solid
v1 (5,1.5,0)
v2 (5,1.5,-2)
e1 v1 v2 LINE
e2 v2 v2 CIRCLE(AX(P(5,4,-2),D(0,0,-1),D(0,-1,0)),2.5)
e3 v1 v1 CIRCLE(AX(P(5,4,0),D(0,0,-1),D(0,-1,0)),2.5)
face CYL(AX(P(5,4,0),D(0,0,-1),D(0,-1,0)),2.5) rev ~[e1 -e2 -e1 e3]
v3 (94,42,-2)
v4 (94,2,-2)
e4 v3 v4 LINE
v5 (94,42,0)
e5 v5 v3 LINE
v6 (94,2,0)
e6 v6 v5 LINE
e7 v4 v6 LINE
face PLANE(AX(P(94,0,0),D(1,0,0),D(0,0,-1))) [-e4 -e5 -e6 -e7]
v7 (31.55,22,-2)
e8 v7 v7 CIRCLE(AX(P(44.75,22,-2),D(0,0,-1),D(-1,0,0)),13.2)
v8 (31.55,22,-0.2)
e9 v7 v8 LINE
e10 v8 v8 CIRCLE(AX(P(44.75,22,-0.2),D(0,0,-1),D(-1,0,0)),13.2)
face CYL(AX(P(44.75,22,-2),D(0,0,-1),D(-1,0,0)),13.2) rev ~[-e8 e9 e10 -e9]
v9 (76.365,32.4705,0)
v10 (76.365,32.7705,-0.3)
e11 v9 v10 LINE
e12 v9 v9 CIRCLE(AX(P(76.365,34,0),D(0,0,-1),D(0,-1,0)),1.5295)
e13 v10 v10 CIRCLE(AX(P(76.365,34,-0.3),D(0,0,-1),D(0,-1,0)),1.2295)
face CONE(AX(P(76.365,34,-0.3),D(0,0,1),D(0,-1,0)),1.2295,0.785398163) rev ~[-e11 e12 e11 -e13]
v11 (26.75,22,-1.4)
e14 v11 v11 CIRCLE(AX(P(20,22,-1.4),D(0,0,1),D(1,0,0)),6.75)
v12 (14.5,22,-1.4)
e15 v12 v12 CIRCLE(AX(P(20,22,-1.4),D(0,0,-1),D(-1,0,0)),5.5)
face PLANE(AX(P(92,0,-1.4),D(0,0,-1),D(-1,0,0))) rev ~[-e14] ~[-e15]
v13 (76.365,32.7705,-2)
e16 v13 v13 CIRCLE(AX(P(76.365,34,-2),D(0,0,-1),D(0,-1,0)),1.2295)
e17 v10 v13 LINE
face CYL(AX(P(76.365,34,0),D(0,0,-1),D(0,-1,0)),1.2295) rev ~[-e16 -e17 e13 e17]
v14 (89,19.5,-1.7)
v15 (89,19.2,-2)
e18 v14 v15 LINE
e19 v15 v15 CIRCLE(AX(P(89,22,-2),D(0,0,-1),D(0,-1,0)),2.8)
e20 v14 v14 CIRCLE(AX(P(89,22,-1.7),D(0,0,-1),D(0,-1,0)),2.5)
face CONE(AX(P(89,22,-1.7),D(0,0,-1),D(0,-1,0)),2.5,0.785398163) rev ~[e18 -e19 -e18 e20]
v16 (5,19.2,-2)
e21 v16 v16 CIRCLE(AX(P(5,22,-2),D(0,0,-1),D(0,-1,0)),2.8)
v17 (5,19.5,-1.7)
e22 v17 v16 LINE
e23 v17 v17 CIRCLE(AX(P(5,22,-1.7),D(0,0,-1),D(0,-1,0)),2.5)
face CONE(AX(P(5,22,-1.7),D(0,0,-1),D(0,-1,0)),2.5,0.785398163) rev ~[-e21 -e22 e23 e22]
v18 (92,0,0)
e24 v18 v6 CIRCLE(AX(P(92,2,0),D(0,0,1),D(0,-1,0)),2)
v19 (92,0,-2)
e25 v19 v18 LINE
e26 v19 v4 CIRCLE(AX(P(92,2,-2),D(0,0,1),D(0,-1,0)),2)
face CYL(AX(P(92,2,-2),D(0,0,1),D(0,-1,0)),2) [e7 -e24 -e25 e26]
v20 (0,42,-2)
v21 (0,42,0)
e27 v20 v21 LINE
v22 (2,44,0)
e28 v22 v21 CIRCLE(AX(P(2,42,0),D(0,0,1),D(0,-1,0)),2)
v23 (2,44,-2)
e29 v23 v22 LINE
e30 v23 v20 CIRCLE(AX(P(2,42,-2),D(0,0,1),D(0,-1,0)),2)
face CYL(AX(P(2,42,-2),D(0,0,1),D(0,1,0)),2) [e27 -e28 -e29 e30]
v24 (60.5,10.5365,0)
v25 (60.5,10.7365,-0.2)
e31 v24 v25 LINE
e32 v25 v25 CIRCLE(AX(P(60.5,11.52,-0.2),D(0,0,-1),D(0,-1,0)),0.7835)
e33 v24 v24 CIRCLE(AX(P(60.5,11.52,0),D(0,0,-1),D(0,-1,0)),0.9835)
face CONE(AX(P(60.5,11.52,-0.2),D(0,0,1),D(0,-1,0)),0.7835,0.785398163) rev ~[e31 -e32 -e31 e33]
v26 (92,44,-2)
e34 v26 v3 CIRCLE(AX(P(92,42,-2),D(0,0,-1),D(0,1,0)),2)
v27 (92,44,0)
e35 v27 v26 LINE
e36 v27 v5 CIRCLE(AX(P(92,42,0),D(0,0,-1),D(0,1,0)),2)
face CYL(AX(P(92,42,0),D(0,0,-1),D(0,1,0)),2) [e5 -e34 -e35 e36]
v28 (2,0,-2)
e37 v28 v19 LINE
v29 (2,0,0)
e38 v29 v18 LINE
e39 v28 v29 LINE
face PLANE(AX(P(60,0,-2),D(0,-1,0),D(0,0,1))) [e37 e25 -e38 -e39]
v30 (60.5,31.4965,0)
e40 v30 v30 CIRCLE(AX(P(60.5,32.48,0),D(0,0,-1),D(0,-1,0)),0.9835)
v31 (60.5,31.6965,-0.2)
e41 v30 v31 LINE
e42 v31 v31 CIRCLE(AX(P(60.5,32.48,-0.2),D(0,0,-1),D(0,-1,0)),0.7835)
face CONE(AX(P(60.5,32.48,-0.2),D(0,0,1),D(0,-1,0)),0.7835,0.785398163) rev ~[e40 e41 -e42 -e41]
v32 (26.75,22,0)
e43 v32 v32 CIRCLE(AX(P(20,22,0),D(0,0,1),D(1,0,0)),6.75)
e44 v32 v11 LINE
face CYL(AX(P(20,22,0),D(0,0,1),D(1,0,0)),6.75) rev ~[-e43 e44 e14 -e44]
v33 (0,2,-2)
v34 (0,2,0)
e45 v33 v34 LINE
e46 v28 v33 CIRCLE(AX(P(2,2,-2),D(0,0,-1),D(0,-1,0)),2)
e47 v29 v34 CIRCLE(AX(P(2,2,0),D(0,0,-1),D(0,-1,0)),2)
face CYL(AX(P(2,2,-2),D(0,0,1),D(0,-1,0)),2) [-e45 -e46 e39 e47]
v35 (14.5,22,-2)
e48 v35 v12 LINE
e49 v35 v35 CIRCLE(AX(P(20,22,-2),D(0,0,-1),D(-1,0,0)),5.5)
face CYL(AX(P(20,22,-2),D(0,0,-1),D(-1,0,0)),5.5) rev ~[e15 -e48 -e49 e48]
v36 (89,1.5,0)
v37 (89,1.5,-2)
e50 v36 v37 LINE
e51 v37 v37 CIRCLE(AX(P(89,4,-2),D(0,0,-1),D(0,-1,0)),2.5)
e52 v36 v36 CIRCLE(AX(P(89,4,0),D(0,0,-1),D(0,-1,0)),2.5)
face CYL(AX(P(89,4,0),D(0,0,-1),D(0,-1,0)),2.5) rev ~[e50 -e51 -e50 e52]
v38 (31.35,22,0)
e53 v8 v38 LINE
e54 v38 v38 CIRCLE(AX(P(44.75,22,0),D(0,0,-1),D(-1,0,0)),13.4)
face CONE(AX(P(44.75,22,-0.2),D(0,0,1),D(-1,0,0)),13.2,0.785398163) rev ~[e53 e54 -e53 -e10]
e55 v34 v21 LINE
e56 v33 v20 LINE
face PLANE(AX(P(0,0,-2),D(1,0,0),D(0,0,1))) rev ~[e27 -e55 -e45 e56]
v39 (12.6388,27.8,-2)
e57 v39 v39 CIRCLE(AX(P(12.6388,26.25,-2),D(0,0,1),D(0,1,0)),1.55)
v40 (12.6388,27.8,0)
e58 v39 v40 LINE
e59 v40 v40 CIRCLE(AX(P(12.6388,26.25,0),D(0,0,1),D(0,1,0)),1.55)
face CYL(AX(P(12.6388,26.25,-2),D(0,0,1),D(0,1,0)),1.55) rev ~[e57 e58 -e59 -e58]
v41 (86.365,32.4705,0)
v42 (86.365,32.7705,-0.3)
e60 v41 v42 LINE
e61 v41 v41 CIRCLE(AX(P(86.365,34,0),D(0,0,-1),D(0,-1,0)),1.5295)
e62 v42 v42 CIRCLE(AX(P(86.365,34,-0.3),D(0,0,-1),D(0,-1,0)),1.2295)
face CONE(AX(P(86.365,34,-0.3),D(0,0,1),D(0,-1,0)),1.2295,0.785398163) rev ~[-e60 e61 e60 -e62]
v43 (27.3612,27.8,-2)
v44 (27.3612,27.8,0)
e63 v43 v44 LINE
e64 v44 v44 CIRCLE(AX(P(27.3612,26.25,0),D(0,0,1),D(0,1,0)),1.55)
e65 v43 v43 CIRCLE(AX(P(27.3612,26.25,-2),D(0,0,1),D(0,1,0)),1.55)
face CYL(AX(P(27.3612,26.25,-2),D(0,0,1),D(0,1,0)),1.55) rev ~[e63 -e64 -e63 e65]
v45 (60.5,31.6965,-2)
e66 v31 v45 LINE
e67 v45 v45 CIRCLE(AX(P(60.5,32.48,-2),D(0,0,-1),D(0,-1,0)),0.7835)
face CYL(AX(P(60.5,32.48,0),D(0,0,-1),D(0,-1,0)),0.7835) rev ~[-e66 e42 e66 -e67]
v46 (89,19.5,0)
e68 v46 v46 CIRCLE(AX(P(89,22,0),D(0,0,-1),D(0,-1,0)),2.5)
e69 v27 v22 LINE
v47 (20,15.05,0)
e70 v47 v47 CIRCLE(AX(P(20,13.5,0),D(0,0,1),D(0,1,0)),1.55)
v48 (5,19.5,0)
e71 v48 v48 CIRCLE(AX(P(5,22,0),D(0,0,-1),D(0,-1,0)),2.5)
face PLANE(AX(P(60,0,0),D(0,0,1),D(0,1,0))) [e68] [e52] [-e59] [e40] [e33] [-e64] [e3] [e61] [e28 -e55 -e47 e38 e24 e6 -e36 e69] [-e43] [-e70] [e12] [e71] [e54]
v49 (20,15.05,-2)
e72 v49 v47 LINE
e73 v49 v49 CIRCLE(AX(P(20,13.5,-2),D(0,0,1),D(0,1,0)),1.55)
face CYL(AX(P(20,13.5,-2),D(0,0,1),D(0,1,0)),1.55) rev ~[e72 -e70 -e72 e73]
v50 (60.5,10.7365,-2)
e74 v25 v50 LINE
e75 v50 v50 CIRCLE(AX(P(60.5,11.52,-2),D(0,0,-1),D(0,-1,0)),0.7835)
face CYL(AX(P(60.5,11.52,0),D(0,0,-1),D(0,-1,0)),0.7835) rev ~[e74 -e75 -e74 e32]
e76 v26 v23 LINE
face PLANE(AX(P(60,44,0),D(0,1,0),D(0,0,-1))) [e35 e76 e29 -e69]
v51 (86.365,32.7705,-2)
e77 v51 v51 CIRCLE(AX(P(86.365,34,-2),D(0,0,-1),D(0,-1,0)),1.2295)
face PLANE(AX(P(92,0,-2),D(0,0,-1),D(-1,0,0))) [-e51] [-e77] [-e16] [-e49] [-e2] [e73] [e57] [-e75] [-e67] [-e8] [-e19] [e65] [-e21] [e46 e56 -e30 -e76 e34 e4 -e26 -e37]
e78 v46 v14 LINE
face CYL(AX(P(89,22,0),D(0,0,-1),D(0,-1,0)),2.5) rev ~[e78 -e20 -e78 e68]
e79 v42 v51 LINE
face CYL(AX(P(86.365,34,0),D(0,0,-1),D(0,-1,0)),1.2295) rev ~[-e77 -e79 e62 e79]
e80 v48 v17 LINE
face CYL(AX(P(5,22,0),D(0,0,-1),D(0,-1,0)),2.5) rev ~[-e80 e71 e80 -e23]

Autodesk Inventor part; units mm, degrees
ref_plane "YZ Plane" through (0, 0, 0) normal (1, 0, 0) x (0, 1, 0)
ref_plane "XZ Plane" through (0, 0, 0) normal (0, 1, 0) x (-1, 0, 0)
ref_plane "XY Plane" through (0, 0, 0) normal (0, 0, 1) x (1, 0, 0)
sketch "Sketch1" plane through (0, 0, 0) normal (0, 1, 0) x (-1, 0, 0)
  line L0 (0, 0) -> (-40, 0)
  line L1 (-40, 0) -> (-40, -2)
  line L2 (-40, -2) -> (0, -2)
  line L3 (0, -2) -> (0, 0)
  dimension "d0" = 40
  dimension "d1" = 2
extrude "Extrusion1" add sketch "Sketch1" along normal blind 44
sketch "Sketch2" plane through (0, 0, 0) normal (0, 0, 1) x (1, 0, 0)
  line L0 (40, 44) -> (0, 44) construction
  line L1 (0, 44) -> (40, 0) construction
  line L2 (40, 44) -> (0, 0) construction
  circle A0 centre (20, 22) radius 6.75
  dimension "d4" = 13.5
extrude "Extrusion2" cut sketch "Sketch2" against normal blind 40
sketch "Sketch3" plane through (40, 0, -2) normal (0, 0, -1) x (-1, 0, 0)
  circle A0 centre (20, 22) radius 6.75 construction
  circle A1 centre (20, 22) radius 8.5 construction
  circle A2 centre (12.6388, 26.25) radius 1.1 construction
  circle A3 centre (27.3612, 26.25) radius 1.1 construction
  line L0 (20, 22) -> (27.3612, 26.25) construction
  line L1 (20, 22) -> (12.6388, 26.25) construction
  circle A4 centre (20, 13.5) radius 1.1 construction
  line L2 (20, 22) -> (20, 13.5) construction
  line L3 (40, 0) -> (40, 44) construction
  dimension "d7" = 17
  dimension "d9" = 2.2
  dimension "d10" = 2.2
  dimension "d22" = 2.2
  dimension "d25" = 120
  dimension "d26" = 120
hole "Hole1" at (20, 13.5, -2) at (12.6388, 26.25, -2) at (27.3612, 26.25, -2) direction (0, 0, 1) diameter 3.1 depth 8.8 tip angle 118 clearance for "Countersunk Flat Head Screw ISO 2009/7046" size "M3" standard "ISO"
sketch "Sketch4" plane through (40, 0, 0) normal (1, 0, 0) x (0, 0, -1)
  line L0 (0, 44) -> (2, 44) projected
  line L1 (0, 0) -> (2, 0)
  line L2 (2, 0) -> (2, 44)
  line L3 (2, 44) -> (0, 44)
  line L4 (0, 44) -> (0, 0)
extrude "Extrusion3" add sketch "Sketch4" along normal blind 20
sketch "Sketch5" plane through (0, 0, -2) normal (0, 0, -1) x (-1, 0, 0)
  circle A0 centre (-44.75, 22) radius 13.2
  line L0 (0, 0) -> (-60, 0) projected
  line L1 (-60, 0) -> (-60.0955, 41.9998)
  line L2 (0, 0) -> (0, 44) projected
  dimension "d27" = 26.4
  dimension "d28" = 22
  dimension "d29" = 15.3
  dimension "d45" = 44.75
extrude "Extrusion4" cut sketch "Sketch5" against normal through all
sketch "Sketch6" plane through (60, 0, 0) normal (1, 0, 0) x (0, 0, -1)
  line L0 (0, 0) -> (0, 44) projected
  line L1 (2, 0) -> (0, 0) projected
  line L2 (0, 44) -> (2, 44)
  line L3 (2, 44) -> (2, 0)
  line L4 (2, 0) -> (0, 0)
  line L5 (0, 0) -> (0, 44)
extrude "Extrusion5" add sketch "Sketch6" along normal blind 34
fillet "Fillet1" radius 2 4 edges at (0, 44, -1) (0, 0, -1) (94, 44, -1) (94, 0, -1)
sketch "Sketch7" plane through (2, 0, 0) normal (0, 0, 1) x (1, 0, 0)
  circle A0 centre (87, 22) radius 2.5
  circle A1 centre (3, 22) radius 2.5
  line L0 (0, 44) -> (90, 44) projected
  line L1 (92, 42) -> (92, 2) projected
  line L2 (0, 0) -> (90, 0) projected
  line L3 (-2, 2) -> (-2, 42) projected
  circle A2 centre (87, 4) radius 2.5
  circle A3 centre (3, 4) radius 2.5
  point P0 (-2, 0)
  dimension "d53" = 5
  dimension "d54" = 5
  dimension "d55" = 22
  dimension "d56" = 5
  dimension "d57" = 22
  dimension "d58" = 5
  dimension "d69" = 44
  dimension "d73" = 5
  dimension "d74" = 18
  dimension "d75" = 5
hole "Hole2" at (5, 22, 0) at (89, 22, 0) at (89, 4, 0) at (5, 4, 0) direction (0, 0, -1) diameter 5 depth 14.2 tip angle 118
chamfer "Chamfer1" distance 0.3 angle 45 2 edges at (5, 24.5, -2) (89, 24.5, -2)
sketch "Sketch8" plane through (92, 0, -2) normal (0, 0, -1) x (-1, 0, 0)
  circle A0 centre (72, 22) radius 6.75 projected
  circle A1 centre (72, 22) radius 6.75
  circle A2 centre (72, 22) radius 5.5
  point P0 (92, 0)
  dimension "d70" = 11
extrude "Extrusion6" add sketch "Sketch8" against normal blind 0.6
sketch "Sketch9" plane through (2, 0, 0) normal (0, 0, 1) x (1, 0, 0)
  circle A0 centre (58.5, 32.48) radius 1
  circle A1 centre (58.5, 11.52) radius 1
  line L0 (0, 44) -> (90, 44) projected
  line L1 (0, 0) -> (90, 0) projected
  line L2 (92, 42) -> (92, 2) projected
  point P0 (-2, 0)
  dimension "d76" = 2
  dimension "d77" = 2
  dimension "d78" = 20.96
  dimension "d79" = 44
  dimension "d80" = 11.52
  dimension "d81" = 33.5
hole "Hole3" at (60.5, 11.52, 0) at (60.5, 32.48, 0) direction (0, 0, -1) diameter 1.567 depth 6.3 tip angle 118 thread size "M2x0.4" class "6H" standard "ISO Metric profile"
chamfer "Chamfer2" distance 0.2 angle 45 1 edges at (57.95, 22, 0)
chamfer "Chamfer3" distance 0.2 angle 45 2 edges at (60.5, 12.3035, 0) (60.5, 33.2635, 0)
sketch "Sketch10" plane through (2, 0, 0) normal (0, 0, 1) x (1, 0, 0)
  circle A0 centre (84.365, 34) radius 1
  circle A1 centre (74.365, 34) radius 1
  line L0 (0, 44) -> (90, 44) projected
  line L1 (92, 42) -> (92, 2) projected
  point P0 (-2, 0)
  dimension "d95" = 2
  dimension "d96" = 2
  dimension "d97" = 10
  dimension "d98" = 10
  dimension "d99" = 7.635
hole "Hole4" at (86.365, 34, 0) at (76.365, 34, 0) direction (0, 0, -1) diameter 2.459 depth 8.8 tip angle 118 thread size "M3x0.5" class "6H" standard "ISO Metric profile"
chamfer "Chamfer4" distance 0.3 angle 45 2 edges at (86.365, 35.2295, 0) (76.365, 35.2295, 0)
equation "\"d55\" = 0.5 * d69"
equation "\"d57\" = 0.5 * d69"
equation "\"d80\" = -0.5 * d78 + 0.5 * d79"
properties part number "płyta silnika"
